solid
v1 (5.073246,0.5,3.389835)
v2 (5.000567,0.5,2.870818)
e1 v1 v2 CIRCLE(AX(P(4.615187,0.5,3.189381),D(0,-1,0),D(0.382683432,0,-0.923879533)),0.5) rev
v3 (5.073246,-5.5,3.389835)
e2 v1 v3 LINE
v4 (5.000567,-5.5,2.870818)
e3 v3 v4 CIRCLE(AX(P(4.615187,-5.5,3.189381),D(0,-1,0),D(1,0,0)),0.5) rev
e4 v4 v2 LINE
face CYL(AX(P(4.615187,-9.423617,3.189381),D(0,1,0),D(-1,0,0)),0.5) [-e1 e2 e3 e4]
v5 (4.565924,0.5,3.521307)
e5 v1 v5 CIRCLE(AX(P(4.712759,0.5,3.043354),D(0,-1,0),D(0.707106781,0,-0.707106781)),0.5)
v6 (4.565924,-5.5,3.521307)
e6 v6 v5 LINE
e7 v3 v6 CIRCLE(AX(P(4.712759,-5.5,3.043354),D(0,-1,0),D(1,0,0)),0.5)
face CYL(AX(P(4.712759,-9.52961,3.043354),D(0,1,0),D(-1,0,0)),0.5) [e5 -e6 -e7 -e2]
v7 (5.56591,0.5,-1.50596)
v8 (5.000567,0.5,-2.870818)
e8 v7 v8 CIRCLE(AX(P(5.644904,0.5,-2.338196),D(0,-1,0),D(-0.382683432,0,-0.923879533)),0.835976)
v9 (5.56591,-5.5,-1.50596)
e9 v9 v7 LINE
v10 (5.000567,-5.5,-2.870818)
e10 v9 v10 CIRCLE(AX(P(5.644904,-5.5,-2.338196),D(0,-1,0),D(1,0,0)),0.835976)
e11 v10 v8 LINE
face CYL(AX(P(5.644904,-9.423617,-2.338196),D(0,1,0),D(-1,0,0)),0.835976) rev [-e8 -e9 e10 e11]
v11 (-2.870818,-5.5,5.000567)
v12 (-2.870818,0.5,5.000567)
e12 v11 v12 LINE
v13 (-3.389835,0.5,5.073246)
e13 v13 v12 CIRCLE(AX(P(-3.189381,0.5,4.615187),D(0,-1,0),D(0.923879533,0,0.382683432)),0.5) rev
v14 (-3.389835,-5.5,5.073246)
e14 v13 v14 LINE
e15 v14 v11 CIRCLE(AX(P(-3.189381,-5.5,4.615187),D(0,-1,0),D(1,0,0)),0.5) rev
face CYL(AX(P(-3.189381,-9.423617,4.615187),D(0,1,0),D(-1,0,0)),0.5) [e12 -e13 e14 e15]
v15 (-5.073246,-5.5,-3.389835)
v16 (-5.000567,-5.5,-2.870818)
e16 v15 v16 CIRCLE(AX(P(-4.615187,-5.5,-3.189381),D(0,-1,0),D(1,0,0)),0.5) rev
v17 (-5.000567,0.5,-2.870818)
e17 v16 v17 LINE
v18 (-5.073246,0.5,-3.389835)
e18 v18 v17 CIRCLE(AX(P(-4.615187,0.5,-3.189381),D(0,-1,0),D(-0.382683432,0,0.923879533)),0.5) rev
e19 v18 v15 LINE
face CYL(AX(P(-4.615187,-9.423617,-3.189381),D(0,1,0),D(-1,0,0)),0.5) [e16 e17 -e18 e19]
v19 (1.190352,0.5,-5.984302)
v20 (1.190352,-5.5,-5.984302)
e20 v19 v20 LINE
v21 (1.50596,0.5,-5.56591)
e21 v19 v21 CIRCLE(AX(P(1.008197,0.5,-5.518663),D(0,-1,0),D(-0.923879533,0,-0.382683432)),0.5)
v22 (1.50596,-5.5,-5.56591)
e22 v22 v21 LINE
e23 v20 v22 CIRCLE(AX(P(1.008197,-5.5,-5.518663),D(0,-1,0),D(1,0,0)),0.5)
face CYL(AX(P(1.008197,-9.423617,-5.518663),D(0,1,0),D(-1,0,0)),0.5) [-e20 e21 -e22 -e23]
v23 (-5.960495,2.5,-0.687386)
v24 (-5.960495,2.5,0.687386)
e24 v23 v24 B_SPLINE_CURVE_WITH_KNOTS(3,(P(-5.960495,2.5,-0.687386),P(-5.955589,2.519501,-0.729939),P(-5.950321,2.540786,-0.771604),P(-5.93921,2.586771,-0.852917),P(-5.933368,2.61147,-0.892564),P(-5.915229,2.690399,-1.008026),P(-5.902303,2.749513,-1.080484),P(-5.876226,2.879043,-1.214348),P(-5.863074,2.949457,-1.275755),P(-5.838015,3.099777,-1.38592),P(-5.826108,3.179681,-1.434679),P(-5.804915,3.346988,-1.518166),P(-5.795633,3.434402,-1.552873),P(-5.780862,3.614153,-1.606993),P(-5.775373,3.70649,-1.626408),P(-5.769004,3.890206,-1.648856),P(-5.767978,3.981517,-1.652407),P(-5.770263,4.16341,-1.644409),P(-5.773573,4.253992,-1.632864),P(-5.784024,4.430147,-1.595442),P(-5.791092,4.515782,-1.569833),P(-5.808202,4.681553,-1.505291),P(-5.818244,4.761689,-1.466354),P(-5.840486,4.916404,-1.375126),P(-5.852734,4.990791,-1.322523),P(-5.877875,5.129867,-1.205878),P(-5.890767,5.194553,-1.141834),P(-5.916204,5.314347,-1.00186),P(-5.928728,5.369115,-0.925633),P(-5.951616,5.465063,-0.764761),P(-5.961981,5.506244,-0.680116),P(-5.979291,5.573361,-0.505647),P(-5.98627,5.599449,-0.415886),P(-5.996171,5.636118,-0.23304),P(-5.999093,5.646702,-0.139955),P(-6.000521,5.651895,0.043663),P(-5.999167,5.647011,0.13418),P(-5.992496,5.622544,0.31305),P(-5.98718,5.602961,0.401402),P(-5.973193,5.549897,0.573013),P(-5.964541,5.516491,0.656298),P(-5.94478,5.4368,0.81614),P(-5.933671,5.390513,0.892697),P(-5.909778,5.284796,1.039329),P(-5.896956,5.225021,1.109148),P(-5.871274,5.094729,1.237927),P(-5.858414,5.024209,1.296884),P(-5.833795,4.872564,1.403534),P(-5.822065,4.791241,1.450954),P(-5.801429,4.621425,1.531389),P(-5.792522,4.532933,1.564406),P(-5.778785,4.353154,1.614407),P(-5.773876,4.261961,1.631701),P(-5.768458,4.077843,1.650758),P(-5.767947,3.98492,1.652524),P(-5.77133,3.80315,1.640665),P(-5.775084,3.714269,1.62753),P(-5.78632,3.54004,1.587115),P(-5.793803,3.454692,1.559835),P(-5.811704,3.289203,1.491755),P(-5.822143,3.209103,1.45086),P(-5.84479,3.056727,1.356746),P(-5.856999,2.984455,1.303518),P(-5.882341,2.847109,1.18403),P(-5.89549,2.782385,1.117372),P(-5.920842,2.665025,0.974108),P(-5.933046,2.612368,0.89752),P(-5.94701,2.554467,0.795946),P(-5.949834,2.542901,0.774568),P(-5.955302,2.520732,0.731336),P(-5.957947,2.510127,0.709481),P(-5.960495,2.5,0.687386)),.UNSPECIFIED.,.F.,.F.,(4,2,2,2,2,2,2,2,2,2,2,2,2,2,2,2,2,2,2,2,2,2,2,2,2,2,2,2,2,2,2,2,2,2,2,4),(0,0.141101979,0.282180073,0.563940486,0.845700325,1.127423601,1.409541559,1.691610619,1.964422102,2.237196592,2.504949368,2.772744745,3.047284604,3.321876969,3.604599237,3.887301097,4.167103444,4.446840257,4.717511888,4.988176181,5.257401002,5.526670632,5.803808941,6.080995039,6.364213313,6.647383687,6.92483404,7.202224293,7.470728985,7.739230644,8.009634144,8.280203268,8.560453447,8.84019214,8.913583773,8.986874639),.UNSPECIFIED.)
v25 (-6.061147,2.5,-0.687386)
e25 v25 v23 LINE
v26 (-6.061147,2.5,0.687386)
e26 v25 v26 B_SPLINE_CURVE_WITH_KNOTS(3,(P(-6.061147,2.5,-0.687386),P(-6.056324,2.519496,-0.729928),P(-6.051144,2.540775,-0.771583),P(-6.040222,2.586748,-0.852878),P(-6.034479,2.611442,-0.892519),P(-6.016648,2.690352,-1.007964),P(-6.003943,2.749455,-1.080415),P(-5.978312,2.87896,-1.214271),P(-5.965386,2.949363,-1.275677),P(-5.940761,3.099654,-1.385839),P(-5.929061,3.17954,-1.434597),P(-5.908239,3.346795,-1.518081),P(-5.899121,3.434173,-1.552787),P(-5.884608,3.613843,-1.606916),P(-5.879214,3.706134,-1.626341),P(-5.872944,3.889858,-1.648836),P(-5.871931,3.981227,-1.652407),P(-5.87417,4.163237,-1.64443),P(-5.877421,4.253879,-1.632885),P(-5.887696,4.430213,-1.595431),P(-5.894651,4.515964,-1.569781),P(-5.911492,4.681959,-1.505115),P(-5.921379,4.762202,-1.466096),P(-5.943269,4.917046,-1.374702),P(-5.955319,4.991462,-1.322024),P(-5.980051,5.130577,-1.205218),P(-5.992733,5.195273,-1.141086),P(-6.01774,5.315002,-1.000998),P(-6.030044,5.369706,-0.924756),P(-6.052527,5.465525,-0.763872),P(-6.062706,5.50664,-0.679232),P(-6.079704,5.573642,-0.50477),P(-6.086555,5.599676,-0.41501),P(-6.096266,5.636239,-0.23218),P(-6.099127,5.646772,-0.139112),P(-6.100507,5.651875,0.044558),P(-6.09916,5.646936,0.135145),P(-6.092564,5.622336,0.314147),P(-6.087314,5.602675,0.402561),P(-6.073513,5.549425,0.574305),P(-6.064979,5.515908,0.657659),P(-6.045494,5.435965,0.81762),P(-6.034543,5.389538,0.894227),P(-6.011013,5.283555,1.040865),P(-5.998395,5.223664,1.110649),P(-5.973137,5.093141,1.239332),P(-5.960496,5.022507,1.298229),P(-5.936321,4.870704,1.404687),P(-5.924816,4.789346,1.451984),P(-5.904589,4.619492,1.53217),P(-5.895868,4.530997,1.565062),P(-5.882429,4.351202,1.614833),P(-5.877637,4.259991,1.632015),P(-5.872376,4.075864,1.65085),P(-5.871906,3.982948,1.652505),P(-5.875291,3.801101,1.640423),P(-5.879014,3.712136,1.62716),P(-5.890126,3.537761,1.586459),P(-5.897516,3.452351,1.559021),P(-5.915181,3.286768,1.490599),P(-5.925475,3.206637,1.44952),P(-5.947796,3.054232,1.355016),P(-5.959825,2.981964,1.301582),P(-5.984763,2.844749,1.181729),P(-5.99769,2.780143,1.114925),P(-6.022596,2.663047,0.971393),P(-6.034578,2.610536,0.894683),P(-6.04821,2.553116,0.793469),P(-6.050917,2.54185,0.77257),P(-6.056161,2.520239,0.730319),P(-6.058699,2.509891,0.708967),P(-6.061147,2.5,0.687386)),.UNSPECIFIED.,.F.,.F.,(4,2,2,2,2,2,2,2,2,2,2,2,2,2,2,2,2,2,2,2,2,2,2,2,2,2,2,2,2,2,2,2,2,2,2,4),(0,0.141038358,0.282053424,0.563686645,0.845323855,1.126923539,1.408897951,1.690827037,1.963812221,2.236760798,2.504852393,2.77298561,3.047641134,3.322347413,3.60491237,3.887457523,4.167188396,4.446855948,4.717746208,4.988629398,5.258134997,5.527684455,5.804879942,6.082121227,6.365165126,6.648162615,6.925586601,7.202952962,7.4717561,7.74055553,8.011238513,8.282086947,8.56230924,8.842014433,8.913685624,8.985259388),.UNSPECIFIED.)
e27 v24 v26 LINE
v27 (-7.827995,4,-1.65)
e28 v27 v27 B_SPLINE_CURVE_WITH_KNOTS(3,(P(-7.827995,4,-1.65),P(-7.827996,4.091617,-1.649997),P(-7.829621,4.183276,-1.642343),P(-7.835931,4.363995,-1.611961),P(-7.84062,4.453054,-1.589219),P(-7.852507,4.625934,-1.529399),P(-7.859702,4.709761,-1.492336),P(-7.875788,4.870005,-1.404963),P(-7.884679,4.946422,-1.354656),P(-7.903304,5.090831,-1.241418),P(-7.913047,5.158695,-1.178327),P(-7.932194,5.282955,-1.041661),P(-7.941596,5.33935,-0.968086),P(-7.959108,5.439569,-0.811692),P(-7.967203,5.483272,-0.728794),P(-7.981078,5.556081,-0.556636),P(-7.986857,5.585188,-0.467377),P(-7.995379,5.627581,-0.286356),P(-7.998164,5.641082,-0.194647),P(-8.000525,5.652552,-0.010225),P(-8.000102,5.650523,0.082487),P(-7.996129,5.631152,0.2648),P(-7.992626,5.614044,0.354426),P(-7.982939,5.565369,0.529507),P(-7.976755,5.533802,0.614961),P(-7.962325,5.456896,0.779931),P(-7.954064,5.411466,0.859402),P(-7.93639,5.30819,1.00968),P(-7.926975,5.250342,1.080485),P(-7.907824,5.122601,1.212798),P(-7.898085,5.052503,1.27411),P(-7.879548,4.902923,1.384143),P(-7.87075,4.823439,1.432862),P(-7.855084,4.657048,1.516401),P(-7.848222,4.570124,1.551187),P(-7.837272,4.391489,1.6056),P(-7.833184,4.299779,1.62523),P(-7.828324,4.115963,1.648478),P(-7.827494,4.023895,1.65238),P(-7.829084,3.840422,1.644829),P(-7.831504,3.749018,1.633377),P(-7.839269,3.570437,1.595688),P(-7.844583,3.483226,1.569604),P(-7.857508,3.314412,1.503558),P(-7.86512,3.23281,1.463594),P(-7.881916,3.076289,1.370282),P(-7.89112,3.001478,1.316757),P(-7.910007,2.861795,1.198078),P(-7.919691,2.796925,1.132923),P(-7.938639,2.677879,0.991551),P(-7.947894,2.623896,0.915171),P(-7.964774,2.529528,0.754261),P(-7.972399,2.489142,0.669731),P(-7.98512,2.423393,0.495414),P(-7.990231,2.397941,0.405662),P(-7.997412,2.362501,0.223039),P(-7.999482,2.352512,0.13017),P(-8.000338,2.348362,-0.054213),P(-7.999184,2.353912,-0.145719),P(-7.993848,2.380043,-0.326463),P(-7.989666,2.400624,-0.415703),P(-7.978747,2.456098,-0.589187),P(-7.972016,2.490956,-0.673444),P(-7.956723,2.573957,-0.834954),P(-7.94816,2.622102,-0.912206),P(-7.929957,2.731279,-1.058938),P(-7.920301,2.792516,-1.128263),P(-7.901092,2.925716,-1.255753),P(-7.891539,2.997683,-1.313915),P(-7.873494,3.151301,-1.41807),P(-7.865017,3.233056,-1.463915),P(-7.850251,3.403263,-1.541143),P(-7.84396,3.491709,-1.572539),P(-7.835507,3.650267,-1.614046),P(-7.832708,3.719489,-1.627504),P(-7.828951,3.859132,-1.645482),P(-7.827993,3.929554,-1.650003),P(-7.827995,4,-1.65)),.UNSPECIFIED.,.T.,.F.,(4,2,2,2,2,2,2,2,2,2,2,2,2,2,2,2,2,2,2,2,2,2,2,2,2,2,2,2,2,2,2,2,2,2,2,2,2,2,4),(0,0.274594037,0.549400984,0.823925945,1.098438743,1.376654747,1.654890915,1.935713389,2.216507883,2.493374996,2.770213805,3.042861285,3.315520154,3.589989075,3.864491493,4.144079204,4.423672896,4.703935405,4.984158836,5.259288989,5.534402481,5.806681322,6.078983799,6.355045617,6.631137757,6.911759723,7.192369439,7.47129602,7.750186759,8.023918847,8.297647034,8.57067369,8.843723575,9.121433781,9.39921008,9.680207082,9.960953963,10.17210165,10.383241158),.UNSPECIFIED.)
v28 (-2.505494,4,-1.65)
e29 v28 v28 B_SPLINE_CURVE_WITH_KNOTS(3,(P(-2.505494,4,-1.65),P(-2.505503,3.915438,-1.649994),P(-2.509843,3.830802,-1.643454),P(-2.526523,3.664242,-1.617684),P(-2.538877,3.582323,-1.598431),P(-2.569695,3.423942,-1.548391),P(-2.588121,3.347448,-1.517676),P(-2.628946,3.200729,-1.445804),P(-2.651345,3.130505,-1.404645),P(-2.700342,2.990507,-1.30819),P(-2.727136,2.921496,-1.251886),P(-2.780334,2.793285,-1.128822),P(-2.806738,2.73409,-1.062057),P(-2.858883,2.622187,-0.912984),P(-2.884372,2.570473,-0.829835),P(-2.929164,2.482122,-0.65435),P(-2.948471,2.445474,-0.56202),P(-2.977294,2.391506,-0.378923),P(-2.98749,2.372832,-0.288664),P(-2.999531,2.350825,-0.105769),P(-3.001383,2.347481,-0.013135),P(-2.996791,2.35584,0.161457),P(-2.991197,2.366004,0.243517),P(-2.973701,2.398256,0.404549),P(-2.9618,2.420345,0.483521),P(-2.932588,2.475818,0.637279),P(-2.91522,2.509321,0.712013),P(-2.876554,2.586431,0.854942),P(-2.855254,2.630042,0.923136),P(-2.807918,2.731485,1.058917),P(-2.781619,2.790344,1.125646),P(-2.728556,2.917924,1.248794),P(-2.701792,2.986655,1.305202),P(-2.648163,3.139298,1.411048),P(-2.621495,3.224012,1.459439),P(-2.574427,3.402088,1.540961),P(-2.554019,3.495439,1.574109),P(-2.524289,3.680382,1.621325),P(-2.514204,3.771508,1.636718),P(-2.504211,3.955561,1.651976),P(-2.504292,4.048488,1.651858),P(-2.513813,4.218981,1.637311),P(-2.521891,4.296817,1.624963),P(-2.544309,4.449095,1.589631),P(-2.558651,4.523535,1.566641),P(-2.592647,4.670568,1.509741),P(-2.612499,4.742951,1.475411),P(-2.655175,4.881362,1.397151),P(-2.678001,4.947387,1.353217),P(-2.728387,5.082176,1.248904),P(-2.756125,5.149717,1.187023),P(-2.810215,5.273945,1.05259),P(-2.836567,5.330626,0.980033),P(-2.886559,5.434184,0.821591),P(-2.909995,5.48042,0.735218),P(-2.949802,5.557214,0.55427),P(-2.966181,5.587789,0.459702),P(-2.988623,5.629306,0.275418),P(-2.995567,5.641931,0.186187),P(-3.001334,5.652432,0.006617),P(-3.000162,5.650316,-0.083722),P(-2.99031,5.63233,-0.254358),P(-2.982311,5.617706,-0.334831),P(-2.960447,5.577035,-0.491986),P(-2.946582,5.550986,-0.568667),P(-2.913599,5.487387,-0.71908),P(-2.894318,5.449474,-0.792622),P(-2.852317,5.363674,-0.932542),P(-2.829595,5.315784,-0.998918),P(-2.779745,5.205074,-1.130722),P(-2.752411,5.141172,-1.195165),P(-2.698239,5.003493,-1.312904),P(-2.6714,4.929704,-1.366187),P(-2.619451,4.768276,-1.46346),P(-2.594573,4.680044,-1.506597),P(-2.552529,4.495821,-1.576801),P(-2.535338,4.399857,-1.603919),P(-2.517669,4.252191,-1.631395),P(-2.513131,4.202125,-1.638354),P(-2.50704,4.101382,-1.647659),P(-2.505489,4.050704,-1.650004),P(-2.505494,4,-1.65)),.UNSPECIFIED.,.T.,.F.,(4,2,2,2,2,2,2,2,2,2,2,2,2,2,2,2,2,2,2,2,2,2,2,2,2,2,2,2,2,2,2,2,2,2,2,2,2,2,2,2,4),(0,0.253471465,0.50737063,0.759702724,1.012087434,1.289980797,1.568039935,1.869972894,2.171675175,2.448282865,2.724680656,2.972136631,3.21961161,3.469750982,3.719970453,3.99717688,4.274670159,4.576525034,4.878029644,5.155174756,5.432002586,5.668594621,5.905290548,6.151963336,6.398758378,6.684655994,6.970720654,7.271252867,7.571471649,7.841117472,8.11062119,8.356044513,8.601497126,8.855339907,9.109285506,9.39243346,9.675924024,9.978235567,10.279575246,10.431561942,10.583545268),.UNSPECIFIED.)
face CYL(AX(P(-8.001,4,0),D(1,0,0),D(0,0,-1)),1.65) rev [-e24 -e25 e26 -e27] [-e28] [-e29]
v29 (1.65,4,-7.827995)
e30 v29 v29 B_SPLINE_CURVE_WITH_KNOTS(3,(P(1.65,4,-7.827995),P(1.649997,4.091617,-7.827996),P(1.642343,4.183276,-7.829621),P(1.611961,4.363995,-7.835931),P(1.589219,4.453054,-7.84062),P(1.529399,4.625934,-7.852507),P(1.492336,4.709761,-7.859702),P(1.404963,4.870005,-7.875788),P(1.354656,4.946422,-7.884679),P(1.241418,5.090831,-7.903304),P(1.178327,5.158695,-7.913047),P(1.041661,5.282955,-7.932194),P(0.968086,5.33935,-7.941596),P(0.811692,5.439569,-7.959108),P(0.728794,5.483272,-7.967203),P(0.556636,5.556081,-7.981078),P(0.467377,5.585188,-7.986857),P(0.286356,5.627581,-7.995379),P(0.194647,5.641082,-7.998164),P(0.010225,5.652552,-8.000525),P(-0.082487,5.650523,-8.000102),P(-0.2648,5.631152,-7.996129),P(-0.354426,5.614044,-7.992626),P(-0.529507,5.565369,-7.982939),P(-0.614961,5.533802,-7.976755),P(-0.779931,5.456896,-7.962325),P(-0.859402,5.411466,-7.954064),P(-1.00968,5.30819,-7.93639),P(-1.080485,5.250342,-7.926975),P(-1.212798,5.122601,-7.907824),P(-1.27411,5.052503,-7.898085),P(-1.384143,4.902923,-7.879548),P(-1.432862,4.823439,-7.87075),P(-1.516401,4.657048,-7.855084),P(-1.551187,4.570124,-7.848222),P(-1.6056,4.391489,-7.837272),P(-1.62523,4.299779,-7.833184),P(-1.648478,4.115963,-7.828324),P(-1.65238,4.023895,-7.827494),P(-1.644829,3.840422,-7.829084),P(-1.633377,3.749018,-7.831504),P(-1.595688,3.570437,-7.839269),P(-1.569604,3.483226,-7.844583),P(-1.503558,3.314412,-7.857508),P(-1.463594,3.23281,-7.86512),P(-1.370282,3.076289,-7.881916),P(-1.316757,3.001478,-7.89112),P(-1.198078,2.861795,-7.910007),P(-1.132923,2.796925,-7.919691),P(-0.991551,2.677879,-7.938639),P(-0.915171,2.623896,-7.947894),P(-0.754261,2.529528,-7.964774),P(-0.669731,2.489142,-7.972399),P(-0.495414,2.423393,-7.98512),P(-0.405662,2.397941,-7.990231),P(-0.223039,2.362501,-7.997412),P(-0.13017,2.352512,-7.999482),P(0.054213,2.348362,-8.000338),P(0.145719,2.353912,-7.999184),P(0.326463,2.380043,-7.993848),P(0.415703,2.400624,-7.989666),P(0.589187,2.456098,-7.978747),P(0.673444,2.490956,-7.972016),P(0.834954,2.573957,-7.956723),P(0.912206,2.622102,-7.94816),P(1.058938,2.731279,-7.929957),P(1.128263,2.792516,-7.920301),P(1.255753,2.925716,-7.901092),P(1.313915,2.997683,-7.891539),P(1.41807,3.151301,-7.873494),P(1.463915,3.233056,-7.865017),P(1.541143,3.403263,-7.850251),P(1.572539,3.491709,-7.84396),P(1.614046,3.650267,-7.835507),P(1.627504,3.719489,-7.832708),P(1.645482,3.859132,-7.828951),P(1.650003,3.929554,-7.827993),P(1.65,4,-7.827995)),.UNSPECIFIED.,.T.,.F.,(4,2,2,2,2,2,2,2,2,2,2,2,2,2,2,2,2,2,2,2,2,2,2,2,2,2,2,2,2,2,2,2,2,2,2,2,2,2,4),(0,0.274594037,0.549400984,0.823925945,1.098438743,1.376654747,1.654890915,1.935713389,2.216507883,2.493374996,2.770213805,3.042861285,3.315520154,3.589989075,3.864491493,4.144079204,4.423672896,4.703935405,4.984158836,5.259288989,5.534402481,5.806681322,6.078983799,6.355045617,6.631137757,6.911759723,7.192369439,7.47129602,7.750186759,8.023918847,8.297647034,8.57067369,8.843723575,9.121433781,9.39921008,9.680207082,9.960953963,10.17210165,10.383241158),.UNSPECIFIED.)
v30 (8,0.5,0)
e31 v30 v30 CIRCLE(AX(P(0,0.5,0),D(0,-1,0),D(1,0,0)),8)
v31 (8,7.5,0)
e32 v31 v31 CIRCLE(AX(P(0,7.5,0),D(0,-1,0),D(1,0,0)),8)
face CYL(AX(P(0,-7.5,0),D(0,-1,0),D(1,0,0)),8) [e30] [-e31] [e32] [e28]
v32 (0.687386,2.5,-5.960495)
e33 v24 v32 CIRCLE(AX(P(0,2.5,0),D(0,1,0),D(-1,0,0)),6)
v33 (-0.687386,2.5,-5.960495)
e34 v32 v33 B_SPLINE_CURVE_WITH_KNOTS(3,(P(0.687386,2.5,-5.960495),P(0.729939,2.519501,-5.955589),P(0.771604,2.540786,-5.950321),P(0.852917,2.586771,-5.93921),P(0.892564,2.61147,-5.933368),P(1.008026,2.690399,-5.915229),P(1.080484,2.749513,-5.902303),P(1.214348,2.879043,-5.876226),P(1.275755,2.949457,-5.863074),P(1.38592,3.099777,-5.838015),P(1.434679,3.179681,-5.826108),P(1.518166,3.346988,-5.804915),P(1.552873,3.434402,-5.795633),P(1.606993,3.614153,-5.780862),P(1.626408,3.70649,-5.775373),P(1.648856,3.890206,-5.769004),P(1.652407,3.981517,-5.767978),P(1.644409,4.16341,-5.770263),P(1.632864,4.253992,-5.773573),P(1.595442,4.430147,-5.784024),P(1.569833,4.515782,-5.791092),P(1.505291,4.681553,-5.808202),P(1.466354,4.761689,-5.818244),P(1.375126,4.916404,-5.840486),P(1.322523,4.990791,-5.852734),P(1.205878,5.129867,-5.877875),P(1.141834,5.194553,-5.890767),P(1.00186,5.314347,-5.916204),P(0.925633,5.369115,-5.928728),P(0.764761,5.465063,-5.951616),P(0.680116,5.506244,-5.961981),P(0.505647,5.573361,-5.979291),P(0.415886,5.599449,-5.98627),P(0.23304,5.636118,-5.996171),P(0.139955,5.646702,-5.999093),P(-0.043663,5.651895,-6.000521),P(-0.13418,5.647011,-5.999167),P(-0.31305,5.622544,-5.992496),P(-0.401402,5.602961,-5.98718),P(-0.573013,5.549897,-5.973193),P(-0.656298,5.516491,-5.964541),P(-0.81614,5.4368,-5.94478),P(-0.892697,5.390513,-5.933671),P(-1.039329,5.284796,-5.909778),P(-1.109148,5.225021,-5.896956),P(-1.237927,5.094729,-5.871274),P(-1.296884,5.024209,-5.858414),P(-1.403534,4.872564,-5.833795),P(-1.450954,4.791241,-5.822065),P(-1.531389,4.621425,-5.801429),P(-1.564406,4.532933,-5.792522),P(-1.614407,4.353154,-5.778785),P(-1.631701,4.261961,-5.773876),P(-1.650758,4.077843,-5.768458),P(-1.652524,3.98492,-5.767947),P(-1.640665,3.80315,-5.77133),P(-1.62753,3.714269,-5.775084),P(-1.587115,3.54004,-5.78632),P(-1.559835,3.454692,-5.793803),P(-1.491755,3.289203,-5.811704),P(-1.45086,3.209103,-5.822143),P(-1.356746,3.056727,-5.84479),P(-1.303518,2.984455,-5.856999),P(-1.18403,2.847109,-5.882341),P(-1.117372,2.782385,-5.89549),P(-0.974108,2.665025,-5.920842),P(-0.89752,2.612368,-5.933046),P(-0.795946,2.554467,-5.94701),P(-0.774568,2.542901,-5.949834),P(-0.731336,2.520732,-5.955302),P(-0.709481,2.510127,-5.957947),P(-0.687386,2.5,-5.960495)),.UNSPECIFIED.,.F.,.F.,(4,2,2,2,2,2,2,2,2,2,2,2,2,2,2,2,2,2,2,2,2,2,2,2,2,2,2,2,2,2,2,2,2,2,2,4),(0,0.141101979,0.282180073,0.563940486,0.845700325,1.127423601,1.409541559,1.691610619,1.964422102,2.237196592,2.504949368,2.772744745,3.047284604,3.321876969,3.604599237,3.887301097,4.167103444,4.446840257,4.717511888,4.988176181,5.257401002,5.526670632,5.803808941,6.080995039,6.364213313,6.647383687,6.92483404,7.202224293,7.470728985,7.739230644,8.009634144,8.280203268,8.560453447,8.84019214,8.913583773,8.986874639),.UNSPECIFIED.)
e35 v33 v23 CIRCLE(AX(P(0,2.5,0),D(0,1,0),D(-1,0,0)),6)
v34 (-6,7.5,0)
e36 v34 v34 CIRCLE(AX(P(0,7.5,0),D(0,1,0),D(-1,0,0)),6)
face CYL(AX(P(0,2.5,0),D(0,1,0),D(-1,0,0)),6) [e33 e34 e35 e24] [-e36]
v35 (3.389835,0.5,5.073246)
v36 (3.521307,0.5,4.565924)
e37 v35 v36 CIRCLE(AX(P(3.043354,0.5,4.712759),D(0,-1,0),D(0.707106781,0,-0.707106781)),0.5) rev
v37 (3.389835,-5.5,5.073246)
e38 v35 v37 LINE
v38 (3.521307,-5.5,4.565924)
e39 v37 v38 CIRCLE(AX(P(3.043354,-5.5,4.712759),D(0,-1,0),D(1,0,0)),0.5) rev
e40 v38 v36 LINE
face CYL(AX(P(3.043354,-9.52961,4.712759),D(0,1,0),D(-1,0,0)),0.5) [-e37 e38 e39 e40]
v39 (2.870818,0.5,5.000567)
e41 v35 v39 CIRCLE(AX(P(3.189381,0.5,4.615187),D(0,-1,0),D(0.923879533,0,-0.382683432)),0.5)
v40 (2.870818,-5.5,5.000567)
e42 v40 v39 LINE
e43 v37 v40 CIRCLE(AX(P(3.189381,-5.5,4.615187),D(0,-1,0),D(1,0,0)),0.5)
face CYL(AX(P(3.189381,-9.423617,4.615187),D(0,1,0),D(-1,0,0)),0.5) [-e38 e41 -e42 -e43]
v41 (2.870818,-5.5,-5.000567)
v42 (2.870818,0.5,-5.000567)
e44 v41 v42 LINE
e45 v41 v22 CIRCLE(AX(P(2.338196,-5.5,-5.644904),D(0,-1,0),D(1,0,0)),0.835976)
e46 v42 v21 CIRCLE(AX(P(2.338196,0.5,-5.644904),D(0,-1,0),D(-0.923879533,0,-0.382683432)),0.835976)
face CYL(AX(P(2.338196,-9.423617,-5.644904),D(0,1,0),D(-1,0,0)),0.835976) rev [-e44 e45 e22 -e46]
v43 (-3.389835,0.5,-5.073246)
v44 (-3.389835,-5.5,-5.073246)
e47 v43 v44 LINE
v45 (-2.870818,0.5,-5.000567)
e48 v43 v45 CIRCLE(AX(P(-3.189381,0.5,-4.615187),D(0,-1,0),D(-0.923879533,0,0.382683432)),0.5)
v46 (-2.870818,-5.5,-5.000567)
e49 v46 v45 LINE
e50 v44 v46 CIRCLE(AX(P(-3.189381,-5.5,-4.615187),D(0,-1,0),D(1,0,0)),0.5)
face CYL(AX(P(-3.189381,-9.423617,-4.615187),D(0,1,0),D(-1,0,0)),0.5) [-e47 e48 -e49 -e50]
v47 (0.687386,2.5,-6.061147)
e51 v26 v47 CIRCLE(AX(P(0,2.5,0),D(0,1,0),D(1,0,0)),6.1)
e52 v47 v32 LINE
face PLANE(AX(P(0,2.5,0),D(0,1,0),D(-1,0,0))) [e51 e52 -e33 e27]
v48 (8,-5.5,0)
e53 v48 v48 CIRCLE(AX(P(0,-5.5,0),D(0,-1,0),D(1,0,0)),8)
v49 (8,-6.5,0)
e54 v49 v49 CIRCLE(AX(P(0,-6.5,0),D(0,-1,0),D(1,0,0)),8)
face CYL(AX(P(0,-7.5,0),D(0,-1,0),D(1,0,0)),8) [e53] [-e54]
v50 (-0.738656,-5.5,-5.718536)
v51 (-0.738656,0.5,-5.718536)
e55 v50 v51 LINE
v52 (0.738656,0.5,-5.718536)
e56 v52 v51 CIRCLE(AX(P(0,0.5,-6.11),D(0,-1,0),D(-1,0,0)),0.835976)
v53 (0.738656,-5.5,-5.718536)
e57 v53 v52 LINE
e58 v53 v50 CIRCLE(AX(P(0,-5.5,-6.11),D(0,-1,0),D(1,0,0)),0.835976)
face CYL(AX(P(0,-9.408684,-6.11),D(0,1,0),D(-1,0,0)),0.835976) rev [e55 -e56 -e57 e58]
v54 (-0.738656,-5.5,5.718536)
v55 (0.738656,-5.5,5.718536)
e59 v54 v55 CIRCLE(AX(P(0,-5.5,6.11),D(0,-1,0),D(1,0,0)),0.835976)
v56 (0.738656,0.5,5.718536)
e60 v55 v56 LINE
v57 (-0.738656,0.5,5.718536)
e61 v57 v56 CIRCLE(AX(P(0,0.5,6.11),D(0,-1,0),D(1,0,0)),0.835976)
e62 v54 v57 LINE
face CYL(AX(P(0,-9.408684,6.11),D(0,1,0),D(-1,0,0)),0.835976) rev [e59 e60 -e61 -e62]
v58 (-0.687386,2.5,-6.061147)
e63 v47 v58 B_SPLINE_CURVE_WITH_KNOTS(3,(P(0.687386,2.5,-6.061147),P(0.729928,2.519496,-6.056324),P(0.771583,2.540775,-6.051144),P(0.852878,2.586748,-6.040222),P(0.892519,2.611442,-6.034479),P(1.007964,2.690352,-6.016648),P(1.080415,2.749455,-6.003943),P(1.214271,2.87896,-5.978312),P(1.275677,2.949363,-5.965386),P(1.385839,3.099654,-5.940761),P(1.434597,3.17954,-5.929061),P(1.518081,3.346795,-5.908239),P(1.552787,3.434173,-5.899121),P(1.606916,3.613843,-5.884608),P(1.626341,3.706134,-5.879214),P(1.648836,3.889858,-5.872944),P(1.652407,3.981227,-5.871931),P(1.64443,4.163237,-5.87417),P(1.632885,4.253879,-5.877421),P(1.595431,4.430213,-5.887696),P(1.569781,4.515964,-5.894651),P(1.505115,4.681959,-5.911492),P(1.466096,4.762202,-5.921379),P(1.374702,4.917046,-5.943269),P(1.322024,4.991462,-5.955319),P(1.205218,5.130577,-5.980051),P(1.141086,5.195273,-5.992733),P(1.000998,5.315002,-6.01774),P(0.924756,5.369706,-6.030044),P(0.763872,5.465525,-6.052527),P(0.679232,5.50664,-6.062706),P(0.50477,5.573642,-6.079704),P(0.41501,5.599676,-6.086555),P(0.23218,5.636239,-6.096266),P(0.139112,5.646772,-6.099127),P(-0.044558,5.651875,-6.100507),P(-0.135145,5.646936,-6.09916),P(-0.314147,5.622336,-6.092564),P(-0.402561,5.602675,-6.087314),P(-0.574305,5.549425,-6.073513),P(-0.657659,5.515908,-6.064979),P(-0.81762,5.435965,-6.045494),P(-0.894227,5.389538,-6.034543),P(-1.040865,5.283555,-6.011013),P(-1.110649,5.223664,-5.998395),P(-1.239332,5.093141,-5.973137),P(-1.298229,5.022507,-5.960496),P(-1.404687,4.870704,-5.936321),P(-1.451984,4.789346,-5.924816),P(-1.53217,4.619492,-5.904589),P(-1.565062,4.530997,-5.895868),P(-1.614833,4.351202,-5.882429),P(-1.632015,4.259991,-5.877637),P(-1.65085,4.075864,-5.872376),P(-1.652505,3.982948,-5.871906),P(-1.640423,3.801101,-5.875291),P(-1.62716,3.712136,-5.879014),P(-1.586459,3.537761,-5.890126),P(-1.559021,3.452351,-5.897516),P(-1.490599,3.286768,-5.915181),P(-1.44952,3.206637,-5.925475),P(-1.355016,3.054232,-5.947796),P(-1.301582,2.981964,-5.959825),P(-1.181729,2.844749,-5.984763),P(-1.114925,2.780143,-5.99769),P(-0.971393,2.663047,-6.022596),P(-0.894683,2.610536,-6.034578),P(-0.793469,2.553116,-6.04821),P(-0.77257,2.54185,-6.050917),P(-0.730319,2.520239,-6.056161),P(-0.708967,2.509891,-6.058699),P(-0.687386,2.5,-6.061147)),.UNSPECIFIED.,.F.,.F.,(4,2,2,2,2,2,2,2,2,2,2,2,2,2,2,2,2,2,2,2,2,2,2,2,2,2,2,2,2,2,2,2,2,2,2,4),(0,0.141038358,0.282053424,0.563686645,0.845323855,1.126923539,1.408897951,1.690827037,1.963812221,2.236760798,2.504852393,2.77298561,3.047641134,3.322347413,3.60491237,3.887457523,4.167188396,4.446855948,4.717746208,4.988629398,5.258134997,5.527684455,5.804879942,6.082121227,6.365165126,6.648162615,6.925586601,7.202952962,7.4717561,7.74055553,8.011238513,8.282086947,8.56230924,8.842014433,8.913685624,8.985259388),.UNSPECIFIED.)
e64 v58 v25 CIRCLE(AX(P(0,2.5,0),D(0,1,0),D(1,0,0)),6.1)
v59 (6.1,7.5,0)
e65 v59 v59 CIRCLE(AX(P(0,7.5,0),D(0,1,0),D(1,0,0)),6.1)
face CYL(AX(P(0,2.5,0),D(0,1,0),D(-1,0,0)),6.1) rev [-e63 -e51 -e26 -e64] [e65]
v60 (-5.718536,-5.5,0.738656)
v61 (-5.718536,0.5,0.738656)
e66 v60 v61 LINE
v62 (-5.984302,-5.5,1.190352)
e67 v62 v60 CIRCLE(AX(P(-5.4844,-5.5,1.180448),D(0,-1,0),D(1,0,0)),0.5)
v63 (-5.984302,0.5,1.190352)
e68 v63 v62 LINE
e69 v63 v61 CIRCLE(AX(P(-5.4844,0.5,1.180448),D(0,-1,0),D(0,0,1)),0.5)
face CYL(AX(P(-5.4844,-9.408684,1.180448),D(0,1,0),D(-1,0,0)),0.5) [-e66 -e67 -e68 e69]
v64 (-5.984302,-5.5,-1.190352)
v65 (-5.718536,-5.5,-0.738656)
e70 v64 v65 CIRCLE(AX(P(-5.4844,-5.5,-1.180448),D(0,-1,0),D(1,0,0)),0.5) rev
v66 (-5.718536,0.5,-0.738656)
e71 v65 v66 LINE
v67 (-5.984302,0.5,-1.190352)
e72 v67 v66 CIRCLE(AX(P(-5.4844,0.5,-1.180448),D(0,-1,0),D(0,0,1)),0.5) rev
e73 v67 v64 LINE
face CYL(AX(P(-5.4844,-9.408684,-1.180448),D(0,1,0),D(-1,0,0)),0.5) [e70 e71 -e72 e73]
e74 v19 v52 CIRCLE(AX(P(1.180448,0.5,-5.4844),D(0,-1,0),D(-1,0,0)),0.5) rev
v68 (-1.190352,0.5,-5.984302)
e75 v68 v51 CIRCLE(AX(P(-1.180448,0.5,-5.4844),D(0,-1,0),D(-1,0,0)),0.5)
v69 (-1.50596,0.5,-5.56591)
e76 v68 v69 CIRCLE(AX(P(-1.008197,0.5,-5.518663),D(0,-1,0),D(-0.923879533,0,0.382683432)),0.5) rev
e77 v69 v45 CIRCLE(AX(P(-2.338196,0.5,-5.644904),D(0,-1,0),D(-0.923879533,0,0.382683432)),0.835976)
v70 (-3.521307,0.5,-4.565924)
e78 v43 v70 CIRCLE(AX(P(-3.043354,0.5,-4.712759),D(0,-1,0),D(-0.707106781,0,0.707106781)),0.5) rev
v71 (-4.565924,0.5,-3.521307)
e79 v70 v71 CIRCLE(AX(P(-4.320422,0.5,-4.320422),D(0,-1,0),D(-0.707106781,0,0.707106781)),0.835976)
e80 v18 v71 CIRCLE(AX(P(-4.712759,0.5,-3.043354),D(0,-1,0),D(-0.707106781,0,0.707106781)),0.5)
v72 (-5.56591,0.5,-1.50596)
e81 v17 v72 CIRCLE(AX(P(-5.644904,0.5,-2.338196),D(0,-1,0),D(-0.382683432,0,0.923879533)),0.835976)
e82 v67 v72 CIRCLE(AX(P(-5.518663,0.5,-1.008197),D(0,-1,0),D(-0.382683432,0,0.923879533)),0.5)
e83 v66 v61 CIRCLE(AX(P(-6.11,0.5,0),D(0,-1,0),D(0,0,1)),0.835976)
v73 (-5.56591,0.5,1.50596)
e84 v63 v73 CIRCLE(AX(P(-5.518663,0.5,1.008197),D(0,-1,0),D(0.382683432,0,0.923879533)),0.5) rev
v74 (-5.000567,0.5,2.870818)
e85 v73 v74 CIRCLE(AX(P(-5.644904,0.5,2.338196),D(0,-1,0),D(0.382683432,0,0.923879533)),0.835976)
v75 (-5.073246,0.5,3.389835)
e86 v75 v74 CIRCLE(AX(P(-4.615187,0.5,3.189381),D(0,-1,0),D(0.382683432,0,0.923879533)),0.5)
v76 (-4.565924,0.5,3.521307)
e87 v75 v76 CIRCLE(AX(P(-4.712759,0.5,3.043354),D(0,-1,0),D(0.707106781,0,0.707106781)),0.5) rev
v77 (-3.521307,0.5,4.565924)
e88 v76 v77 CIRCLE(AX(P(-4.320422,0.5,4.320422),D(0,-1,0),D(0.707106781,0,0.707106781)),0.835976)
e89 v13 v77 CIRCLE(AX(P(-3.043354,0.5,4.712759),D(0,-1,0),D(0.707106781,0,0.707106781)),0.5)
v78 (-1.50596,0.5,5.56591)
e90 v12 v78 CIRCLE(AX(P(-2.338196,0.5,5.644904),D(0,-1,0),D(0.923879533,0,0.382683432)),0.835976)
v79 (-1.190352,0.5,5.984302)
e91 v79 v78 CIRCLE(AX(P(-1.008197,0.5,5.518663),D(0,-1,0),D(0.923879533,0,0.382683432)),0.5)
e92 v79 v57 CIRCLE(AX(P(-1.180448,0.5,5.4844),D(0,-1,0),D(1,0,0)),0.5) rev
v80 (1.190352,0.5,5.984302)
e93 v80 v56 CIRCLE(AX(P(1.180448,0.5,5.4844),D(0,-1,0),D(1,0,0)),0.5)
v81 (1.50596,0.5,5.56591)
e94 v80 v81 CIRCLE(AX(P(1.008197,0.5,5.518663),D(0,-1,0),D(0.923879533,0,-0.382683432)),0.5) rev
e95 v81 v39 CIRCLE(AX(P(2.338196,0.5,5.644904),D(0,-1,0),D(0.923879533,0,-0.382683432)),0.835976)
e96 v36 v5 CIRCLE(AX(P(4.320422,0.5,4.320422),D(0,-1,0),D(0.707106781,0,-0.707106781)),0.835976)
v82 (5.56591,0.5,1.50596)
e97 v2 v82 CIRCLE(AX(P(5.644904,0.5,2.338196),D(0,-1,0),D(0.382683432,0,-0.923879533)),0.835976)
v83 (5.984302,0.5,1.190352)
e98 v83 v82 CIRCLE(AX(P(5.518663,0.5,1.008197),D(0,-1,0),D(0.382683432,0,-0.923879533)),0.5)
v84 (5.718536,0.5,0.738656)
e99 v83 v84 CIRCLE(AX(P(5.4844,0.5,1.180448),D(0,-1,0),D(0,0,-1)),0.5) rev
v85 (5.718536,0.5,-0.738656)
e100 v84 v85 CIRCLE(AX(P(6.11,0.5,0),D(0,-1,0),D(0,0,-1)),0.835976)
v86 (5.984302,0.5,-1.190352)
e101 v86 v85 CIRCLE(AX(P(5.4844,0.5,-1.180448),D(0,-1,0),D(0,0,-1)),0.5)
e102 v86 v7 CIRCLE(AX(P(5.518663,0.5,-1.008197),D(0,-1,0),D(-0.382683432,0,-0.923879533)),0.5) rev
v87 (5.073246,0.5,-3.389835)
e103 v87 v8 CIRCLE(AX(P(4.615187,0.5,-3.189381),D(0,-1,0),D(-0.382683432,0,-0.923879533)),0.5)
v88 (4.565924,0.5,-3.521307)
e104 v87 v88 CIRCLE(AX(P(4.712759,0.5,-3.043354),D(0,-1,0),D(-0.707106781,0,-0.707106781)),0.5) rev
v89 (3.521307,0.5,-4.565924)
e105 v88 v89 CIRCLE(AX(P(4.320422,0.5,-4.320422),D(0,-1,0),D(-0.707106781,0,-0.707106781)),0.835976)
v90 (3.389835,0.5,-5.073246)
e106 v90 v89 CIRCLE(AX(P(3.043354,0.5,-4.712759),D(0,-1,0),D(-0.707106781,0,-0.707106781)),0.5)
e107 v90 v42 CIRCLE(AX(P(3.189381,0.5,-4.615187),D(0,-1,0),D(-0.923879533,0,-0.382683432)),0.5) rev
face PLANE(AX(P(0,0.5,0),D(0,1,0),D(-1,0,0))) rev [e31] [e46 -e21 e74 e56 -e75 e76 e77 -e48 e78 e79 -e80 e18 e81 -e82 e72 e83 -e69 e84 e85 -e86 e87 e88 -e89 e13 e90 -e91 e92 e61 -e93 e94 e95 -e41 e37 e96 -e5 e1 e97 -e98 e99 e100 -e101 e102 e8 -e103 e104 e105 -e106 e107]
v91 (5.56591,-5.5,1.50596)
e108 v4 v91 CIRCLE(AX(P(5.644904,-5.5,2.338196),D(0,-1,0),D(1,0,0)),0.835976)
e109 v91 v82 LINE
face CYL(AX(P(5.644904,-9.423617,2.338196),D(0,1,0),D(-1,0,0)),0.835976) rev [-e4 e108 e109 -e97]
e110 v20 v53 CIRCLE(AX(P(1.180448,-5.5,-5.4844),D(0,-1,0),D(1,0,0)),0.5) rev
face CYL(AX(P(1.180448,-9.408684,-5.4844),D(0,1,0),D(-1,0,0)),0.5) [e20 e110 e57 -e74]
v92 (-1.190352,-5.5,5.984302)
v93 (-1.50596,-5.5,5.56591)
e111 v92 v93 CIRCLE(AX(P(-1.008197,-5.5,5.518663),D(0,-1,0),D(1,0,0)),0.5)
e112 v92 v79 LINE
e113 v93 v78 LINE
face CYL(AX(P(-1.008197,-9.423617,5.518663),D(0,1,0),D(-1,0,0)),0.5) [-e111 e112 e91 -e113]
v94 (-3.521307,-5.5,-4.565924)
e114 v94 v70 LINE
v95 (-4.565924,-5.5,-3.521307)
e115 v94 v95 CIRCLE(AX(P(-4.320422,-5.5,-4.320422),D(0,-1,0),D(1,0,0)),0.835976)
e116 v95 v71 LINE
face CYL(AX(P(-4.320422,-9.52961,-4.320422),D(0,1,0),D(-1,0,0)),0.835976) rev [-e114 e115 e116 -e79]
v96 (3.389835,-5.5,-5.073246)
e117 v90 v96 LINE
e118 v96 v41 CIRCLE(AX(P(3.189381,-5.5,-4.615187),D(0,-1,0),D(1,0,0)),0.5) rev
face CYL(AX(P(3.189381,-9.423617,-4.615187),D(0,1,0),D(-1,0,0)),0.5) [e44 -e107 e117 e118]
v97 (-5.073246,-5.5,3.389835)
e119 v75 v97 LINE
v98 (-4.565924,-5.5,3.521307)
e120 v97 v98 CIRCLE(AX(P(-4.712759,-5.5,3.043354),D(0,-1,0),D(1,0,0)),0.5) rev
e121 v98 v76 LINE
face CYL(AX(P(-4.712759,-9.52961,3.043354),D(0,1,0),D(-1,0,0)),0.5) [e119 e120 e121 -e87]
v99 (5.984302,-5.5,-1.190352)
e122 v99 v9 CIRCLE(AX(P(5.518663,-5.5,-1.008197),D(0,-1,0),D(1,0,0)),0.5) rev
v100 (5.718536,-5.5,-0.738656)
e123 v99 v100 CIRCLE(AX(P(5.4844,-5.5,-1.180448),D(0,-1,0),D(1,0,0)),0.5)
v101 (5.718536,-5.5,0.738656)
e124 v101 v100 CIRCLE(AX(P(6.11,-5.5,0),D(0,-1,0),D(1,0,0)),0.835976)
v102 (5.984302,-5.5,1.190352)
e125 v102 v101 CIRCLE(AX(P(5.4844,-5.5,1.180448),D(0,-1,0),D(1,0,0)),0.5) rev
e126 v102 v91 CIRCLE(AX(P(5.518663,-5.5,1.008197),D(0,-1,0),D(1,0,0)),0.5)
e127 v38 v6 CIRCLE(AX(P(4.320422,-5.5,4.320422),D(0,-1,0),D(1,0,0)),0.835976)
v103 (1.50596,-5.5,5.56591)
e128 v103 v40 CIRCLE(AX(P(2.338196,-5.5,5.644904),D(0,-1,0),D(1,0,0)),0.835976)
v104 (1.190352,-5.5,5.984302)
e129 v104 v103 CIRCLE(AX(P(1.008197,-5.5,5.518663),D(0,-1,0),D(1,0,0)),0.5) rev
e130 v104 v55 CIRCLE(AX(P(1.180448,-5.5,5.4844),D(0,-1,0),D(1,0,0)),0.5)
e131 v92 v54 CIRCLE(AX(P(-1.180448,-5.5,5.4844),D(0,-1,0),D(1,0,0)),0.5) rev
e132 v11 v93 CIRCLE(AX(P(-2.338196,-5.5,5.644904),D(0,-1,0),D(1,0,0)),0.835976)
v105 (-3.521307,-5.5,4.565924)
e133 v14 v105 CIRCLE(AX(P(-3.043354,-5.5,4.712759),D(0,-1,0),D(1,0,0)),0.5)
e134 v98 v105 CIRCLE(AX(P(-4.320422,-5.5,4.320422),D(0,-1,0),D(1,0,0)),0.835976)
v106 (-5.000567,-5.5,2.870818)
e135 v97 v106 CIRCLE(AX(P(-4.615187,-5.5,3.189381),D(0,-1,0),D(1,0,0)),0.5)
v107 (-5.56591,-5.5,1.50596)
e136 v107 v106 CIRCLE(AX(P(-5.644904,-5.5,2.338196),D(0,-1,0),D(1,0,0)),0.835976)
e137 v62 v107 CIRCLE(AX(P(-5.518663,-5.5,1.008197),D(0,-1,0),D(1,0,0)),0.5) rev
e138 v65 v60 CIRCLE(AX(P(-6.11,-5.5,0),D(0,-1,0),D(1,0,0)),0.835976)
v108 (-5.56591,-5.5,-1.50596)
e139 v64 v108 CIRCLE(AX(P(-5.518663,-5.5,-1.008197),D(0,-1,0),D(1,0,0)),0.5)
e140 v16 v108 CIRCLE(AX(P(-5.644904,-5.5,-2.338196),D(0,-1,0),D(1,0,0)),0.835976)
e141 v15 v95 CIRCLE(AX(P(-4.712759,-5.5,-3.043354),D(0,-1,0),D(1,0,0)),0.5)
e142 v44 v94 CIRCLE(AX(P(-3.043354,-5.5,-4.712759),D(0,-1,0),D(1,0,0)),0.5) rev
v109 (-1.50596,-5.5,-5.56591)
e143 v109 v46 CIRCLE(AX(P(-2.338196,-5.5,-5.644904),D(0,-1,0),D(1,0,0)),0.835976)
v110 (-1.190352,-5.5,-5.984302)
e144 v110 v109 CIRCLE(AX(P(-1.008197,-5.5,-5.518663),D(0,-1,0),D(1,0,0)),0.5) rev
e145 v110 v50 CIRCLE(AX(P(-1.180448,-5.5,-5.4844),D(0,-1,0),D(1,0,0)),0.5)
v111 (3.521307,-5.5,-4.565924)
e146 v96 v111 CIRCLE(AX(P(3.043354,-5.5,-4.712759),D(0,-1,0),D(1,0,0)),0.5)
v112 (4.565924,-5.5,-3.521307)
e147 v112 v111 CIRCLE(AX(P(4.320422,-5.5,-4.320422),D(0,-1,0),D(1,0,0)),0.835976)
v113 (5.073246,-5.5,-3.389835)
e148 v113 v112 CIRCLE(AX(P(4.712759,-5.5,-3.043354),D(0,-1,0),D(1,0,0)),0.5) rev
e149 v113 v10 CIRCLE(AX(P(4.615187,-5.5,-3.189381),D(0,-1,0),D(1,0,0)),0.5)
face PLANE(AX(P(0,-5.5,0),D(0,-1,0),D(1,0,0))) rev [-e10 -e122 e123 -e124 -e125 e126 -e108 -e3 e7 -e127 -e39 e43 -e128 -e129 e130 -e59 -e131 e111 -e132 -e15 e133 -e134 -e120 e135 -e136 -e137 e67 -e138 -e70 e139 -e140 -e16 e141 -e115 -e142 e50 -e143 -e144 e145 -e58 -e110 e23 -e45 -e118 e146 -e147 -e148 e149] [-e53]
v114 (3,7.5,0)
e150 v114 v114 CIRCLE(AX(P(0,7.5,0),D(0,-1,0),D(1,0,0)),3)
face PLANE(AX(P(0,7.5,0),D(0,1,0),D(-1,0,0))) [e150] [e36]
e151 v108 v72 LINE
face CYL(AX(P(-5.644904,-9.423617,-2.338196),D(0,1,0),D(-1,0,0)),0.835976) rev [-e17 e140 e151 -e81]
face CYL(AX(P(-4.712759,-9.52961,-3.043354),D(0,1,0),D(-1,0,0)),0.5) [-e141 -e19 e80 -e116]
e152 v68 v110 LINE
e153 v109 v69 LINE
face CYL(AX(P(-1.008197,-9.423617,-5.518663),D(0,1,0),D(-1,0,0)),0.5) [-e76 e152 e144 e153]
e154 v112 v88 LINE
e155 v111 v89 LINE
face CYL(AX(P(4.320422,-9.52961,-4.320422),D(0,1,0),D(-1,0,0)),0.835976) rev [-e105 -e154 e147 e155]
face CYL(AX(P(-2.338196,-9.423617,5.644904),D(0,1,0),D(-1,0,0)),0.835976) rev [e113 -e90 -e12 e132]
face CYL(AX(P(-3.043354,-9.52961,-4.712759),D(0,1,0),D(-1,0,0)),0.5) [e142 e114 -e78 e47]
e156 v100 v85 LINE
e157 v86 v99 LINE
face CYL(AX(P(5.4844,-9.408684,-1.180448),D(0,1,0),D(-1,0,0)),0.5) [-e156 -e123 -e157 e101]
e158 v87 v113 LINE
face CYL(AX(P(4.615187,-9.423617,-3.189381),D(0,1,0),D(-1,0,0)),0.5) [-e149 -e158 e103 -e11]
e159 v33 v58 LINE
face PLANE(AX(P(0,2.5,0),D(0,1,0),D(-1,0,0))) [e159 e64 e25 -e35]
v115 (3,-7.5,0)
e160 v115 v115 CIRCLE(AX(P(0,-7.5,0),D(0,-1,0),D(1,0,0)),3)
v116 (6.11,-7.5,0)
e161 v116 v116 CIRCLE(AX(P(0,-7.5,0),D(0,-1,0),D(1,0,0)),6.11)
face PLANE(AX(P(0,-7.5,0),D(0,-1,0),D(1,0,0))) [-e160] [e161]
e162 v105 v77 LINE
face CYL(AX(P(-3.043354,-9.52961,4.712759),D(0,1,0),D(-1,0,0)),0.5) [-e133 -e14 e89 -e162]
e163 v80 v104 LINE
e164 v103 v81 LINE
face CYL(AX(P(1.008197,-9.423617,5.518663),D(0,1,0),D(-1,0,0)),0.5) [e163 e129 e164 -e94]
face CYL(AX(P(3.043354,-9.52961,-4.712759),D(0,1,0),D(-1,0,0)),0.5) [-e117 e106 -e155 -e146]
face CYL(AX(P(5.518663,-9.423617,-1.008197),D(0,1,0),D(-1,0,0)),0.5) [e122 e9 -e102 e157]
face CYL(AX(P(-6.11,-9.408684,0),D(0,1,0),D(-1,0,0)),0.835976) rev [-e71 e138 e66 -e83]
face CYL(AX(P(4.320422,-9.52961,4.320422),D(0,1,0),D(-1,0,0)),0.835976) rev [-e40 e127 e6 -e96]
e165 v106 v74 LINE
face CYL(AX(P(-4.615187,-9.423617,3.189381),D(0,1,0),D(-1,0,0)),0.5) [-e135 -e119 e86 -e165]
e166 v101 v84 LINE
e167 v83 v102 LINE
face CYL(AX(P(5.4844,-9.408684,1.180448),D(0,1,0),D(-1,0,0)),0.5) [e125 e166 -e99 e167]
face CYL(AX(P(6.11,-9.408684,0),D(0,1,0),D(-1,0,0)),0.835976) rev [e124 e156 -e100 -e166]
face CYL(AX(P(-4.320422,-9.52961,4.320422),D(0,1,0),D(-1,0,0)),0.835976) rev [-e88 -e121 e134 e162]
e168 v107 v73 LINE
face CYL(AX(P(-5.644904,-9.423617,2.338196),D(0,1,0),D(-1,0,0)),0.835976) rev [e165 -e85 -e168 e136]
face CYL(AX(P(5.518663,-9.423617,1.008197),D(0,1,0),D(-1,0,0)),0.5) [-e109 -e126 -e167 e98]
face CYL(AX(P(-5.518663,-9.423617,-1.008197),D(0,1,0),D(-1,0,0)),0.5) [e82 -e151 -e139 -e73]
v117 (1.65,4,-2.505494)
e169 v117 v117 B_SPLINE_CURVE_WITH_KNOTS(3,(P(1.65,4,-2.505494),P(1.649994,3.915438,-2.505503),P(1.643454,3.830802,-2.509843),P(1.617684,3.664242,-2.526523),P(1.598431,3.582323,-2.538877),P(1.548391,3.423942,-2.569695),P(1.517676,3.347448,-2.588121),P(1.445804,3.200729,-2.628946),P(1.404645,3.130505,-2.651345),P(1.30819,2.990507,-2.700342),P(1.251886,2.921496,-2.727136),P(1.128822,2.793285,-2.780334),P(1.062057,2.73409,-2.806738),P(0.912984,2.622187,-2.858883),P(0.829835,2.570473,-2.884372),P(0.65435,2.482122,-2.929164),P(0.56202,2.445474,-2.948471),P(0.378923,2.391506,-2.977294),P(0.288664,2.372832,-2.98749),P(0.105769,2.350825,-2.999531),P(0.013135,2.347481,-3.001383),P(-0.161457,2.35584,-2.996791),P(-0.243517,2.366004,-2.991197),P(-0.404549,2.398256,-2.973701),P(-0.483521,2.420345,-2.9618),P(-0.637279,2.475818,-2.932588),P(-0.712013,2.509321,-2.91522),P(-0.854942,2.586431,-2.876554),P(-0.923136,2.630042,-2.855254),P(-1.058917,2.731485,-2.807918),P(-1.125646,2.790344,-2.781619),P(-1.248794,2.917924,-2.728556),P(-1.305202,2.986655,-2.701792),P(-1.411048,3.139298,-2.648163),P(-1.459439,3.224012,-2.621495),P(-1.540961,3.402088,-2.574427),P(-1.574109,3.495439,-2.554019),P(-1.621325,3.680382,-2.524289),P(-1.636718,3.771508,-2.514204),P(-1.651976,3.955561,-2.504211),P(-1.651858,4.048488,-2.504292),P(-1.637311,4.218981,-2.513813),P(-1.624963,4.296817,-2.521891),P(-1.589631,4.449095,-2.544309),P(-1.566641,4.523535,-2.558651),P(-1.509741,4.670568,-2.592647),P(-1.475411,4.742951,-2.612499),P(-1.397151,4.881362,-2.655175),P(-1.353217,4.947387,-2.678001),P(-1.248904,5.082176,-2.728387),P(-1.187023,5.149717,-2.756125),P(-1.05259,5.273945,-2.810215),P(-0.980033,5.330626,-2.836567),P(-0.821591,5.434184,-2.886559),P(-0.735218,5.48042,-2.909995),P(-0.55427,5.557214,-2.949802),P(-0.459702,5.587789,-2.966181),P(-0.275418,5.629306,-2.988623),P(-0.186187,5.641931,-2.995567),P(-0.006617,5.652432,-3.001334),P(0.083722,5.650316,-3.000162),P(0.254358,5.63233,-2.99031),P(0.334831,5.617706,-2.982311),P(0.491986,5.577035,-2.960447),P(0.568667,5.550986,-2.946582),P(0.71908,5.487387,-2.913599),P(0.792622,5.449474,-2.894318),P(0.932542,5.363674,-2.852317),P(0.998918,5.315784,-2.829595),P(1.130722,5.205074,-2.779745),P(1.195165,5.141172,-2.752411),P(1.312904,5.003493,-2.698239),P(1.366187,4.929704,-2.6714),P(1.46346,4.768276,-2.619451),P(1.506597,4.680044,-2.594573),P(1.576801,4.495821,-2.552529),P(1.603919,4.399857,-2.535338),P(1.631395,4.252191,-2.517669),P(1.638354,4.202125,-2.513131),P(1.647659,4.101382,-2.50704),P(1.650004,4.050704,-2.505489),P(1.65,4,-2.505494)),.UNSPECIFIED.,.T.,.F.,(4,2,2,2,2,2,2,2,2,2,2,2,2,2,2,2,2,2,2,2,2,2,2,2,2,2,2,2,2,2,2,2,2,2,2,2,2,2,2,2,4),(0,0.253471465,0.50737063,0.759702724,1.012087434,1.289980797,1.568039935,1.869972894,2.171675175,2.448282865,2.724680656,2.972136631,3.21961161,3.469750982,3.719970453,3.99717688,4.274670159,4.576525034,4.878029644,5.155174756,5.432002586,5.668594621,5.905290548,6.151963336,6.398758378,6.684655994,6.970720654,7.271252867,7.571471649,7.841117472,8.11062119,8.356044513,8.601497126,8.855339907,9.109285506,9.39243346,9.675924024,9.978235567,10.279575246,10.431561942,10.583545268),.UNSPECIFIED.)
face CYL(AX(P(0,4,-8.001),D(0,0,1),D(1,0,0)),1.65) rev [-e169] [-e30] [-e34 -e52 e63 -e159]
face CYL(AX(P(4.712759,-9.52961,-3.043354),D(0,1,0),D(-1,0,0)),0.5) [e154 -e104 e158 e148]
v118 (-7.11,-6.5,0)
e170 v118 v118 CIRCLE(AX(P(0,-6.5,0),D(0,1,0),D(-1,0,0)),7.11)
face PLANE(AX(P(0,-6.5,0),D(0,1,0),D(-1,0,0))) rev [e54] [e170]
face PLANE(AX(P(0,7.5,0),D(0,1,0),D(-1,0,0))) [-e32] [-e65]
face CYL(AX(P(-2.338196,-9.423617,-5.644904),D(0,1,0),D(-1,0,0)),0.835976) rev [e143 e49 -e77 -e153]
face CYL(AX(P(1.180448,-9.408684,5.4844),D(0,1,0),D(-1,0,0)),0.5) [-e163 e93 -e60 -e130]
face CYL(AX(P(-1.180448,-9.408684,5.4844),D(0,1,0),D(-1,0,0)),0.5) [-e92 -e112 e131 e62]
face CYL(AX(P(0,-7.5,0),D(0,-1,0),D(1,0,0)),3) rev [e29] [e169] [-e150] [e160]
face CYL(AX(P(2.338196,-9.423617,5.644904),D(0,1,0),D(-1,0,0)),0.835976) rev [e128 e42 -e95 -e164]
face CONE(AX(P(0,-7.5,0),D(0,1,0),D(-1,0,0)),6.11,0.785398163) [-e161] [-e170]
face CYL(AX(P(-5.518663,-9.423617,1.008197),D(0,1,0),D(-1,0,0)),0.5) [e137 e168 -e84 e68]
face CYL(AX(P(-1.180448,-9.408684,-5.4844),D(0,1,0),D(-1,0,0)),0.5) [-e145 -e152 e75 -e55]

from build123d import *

# Parameters (mm, degrees)
CUT_EXTRUDE1_DEPTH      = 6
CIRPATTERN1_COUNT       = 16
CUT_EXTRUDE2_REACH      = 15.574
CUT_EXTRUDE2_END_RADIUS = 8
SKETCH3_R               = 1.65
CUT_EXTRUDE3_REACH      = 15.574
CUT_EXTRUDE3_END_RADIUS = 8
SKETCH4_R               = 1.65
SKETCH5_R               = 6.1
SKETCH5_R_2             = 6
CUT_EXTRUDE_THIN1_DEPTH = 5
CHAMFER1_SIZE           = 1


with BuildPart() as part:
    # Skica2 → Revolute (revolve)
    with BuildSketch(Plane.XY):
        Polygon((8, 7.5), (3, 7.5), (3, -7.5), (6.11, -7.5), (6.11, -6.5), (8, -6.5), (8, -5.5), (6.11, -5.5), (6.11, 0.5), (8, 0.5), align=None)
    revolve(axis=Axis((0, -7.5, 0), (0, 1, 0)))

    # Sketch2 → Cut-Extrude1 (cut)
    with BuildSketch(Plane.XZ.offset(-0.5)):
        with BuildLine():
            ThreePointArc((-1.285657138, 5.973205649), (-0.969411866, 5.937681099), (-0.73865565, 5.718535862))
            ThreePointArc((-0.73865565, 5.718535862), (0, 5.27402372), (0.73865565, 5.718535862))
            ThreePointArc((0.73865565, 5.718535862), (0.969411866, 5.937681099), (1.285657138, 5.973205649))
            ThreePointArc((1.285657138, 5.973205649), (0, 6.11), (-1.285657138, 5.973205649))
        make_face()
    cut_extrude1 = extrude(amount=CUT_EXTRUDE1_DEPTH, mode=Mode.SUBTRACT)

    # CirPattern1: Cut-Extrude1 ×16 about axis
    cirpattern1_axis = Axis((0, 0, 0), (0, 1, 0))
    for i in range(1, CIRPATTERN1_COUNT):
        add(cut_extrude1.rotate(cirpattern1_axis, i * 360 / CIRPATTERN1_COUNT), mode=Mode.SUBTRACT)

    # Cut-Extrude2: up to this cylinder (the profile starts inside it)
    cut_extrude2_end = Plane(origin=(0, 4, 0), z_dir=(0, -1, 0)) * Cylinder(CUT_EXTRUDE2_END_RADIUS, 48.148, mode=Mode.PRIVATE)
    # Sketch3 → Cut-Extrude2 (cut, up to the surface)
    with BuildSketch(Plane(origin=(0, 0, 0), x_dir=(0, 0, -1), z_dir=(1, 0, 0)), mode=Mode.PRIVATE) as cut_extrude2_sk1:
        with Locations((0, 4)):
            Circle(SKETCH3_R)
    cut_extrude2_tool1 = extrude(cut_extrude2_sk1.sketch, amount=-CUT_EXTRUDE2_REACH, mode=Mode.PRIVATE) & cut_extrude2_end
    add(cut_extrude2_tool1.solids().sort_by_distance((0, 4, 0))[0], mode=Mode.SUBTRACT)

    # Cut-Extrude3: up to this cylinder (the profile starts inside it)
    cut_extrude3_end = Plane(origin=(0, 4, 0), z_dir=(0, -1, 0)) * Cylinder(CUT_EXTRUDE3_END_RADIUS, 48.148, mode=Mode.PRIVATE)
    # Sketch4 → Cut-Extrude3 (cut, up to the surface)
    with BuildSketch(Plane.XY, mode=Mode.PRIVATE) as cut_extrude3_sk1:
        with Locations((0, 4)):
            Circle(SKETCH4_R)
    cut_extrude3_tool1 = extrude(cut_extrude3_sk1.sketch, amount=-CUT_EXTRUDE3_REACH, mode=Mode.PRIVATE) & cut_extrude3_end
    add(cut_extrude3_tool1.solids().sort_by_distance((0, 4, 0))[0], mode=Mode.SUBTRACT)

    # Sketch5 → Cut-Extrude-Thin1 (cut)
    with BuildSketch(Plane(origin=(0, 7.5, 0), x_dir=(1, 0, 0), z_dir=(0, 1, 0))):
        Circle(SKETCH5_R)
        Circle(SKETCH5_R_2, mode=Mode.SUBTRACT)
    extrude(amount=-CUT_EXTRUDE_THIN1_DEPTH, mode=Mode.SUBTRACT)

    # Chamfer1
    chamfer1_edges = [part.edges().sort_by_distance(p)[0] for p in [
        (-6.11, -6.5, 0),
    ]]
    chamfer(chamfer1_edges, length=CHAMFER1_SIZE - 0.0001)  # a hair under: the kernel refuses the full size


solid = part.part
